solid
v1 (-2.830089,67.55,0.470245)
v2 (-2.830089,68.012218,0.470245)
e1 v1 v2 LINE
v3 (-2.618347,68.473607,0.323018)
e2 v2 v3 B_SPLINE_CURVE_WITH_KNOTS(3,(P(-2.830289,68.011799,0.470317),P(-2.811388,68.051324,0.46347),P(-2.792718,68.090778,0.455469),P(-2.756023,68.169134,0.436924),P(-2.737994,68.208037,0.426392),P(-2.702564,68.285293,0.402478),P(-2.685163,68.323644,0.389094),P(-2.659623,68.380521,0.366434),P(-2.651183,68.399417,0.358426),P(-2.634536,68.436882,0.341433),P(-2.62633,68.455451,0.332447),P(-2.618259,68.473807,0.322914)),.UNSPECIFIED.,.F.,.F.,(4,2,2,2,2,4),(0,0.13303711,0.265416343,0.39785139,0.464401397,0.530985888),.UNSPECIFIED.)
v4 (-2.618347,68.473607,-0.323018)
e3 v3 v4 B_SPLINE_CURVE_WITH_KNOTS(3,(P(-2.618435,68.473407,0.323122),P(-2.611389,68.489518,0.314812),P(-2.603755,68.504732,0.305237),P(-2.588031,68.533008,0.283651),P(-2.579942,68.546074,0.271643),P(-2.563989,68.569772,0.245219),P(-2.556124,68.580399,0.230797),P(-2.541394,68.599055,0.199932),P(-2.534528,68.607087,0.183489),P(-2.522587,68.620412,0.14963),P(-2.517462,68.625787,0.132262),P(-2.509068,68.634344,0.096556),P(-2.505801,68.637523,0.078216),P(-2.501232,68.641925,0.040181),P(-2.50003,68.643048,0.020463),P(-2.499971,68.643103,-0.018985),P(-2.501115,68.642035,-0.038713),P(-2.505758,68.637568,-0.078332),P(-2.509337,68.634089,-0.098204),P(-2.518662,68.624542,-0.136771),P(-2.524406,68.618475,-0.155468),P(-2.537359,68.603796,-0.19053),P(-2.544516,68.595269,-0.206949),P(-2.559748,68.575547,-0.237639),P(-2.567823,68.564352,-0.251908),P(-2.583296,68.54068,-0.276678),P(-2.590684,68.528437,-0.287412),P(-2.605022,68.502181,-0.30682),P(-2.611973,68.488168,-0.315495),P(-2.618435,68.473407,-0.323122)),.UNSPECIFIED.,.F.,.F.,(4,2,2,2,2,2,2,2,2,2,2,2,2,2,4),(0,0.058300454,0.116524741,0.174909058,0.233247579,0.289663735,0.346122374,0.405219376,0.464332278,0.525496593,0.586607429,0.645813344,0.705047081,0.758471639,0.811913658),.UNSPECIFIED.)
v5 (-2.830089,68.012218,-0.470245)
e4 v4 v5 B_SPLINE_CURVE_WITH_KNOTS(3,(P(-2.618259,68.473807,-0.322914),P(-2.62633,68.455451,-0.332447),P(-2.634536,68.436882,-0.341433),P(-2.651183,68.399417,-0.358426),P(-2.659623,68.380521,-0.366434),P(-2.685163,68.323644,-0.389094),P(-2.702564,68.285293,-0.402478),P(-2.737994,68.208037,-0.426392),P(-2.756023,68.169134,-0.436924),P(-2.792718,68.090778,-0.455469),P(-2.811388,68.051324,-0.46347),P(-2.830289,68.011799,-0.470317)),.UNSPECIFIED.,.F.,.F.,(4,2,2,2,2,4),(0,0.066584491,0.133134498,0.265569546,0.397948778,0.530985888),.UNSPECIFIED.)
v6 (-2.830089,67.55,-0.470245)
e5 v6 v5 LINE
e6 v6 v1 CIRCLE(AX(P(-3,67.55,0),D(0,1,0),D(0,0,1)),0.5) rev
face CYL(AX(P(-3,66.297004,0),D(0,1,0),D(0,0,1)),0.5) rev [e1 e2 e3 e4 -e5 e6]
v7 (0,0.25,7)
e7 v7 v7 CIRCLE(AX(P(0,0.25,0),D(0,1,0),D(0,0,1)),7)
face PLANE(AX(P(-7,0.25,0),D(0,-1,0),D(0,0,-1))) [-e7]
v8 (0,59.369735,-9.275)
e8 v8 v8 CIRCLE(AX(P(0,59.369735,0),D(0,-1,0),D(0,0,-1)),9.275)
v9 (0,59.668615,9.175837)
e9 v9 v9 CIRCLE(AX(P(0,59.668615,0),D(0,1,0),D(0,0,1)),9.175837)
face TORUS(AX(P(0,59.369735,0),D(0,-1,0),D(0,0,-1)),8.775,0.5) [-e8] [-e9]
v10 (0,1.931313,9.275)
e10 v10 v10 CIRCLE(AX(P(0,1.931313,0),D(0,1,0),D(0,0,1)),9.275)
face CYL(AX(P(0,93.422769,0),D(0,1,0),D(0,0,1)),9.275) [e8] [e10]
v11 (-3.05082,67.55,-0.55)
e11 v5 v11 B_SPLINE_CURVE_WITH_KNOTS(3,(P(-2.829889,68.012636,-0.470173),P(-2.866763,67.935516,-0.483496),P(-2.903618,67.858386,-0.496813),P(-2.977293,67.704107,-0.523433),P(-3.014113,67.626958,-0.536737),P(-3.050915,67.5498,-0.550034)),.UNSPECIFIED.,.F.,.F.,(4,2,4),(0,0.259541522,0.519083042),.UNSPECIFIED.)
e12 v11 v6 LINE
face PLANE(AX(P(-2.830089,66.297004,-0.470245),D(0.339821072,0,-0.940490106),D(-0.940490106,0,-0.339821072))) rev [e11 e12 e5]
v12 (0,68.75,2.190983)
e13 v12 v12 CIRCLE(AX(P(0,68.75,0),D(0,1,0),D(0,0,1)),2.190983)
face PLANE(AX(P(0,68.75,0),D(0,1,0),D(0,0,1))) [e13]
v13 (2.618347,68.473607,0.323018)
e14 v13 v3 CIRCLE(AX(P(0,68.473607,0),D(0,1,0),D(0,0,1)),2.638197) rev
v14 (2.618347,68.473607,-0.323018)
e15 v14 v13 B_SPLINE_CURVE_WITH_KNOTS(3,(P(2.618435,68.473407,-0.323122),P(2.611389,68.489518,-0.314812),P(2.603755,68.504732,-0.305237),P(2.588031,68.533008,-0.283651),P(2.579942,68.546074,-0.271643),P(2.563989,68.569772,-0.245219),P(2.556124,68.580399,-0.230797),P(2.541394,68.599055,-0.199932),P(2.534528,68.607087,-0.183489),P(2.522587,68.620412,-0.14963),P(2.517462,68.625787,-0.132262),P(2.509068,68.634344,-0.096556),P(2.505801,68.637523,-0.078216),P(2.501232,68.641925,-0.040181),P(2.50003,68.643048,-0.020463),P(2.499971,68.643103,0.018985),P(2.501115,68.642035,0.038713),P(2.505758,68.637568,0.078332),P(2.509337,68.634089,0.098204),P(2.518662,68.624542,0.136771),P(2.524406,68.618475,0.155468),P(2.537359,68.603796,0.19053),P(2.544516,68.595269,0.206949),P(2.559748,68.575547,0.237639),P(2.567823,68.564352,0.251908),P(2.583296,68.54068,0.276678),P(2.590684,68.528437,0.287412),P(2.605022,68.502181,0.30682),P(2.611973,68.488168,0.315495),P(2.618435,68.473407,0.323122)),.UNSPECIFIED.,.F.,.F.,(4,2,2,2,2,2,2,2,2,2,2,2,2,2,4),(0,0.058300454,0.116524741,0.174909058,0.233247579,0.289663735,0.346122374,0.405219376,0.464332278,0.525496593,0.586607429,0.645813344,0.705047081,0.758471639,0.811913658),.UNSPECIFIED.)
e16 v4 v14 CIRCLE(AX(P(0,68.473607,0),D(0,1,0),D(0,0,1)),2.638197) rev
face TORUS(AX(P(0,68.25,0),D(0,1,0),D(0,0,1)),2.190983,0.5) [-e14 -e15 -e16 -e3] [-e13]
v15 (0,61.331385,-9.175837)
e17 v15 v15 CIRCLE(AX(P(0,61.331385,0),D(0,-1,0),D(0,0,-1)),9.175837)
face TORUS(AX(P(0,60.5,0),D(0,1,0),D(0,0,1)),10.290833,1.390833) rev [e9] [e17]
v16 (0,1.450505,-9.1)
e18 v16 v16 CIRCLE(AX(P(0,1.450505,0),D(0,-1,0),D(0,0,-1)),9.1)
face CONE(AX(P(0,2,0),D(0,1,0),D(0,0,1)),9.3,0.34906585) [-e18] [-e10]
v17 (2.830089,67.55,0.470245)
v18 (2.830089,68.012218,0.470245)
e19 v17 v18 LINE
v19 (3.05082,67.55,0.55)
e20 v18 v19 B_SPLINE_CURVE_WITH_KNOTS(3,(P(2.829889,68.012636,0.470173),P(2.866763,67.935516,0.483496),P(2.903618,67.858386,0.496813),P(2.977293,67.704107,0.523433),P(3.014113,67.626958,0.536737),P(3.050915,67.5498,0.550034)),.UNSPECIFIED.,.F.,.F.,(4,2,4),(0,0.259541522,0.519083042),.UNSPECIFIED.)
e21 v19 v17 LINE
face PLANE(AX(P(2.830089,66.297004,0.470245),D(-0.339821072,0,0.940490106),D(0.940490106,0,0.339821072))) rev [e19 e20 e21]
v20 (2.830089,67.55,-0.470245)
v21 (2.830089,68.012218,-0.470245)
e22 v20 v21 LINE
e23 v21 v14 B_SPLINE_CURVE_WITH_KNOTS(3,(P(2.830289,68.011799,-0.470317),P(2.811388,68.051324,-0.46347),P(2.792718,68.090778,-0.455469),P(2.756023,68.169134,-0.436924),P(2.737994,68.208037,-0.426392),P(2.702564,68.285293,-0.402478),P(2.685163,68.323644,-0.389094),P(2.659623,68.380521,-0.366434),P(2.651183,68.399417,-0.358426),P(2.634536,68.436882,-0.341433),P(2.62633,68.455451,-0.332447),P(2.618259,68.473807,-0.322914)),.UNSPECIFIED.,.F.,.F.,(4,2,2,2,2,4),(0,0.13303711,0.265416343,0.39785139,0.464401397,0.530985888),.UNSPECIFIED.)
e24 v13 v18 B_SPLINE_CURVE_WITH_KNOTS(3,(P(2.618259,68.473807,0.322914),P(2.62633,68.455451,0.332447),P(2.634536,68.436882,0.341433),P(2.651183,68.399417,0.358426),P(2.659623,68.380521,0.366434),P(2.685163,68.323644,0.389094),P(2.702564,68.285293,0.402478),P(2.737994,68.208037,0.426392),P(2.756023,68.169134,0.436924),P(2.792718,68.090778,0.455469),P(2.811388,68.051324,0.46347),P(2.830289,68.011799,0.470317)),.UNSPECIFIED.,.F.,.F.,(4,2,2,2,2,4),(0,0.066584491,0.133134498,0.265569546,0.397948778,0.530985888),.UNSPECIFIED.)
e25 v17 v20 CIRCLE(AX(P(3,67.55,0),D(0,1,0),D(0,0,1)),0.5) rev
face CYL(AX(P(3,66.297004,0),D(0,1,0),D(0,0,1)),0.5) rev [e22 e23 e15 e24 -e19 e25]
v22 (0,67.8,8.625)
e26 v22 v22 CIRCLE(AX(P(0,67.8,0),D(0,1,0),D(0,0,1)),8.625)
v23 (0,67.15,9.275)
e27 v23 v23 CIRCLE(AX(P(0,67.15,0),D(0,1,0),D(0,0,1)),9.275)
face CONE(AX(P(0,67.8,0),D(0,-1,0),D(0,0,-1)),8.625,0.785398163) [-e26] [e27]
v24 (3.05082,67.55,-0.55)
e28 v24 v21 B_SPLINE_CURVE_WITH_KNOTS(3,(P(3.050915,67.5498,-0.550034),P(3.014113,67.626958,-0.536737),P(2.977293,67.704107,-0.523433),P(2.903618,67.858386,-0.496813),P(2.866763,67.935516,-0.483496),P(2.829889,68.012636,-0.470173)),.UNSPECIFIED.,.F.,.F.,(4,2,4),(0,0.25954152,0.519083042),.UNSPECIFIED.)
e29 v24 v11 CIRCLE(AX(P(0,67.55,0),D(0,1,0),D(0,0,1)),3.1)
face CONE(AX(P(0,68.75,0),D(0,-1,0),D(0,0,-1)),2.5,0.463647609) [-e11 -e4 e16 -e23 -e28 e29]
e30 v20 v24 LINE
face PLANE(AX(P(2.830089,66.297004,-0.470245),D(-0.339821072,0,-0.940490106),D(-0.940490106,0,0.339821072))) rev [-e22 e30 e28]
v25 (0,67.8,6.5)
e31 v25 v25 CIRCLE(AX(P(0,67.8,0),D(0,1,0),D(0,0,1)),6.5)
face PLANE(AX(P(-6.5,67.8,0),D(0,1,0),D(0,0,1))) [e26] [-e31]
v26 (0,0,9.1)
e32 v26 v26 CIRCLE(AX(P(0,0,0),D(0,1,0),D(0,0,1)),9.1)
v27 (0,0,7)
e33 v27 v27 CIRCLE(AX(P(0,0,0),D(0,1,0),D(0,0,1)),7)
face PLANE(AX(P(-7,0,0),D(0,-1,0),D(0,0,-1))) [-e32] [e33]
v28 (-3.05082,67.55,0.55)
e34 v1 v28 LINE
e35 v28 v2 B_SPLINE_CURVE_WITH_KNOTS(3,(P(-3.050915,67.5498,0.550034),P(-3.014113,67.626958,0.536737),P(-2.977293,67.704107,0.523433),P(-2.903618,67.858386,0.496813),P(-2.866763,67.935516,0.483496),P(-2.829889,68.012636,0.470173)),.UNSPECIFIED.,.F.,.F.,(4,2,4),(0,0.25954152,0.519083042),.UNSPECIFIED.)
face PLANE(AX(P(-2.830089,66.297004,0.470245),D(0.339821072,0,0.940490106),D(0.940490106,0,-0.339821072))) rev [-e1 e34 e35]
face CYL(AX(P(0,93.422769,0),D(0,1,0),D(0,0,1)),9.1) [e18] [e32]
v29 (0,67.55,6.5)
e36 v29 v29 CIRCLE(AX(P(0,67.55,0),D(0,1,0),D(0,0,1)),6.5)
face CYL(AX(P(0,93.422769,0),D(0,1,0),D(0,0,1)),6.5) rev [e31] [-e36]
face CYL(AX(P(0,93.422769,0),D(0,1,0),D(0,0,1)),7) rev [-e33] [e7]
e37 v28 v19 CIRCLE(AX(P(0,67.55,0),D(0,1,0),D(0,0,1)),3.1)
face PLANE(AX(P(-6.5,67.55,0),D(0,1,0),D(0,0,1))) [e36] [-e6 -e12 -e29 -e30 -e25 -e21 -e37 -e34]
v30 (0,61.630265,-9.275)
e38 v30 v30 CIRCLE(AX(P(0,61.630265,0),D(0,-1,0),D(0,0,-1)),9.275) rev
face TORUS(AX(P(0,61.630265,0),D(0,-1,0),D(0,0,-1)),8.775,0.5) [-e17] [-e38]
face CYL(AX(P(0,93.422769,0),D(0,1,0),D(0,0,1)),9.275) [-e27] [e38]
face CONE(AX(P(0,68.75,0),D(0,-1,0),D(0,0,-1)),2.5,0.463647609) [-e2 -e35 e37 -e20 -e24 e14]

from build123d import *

# Parameters (mm, degrees)
CHAMFER_1_SIZE      = 0.2
CHAMFER_1_SIZE_2    = 0.549495484
FILLET_1_R          = 0.5
CUT_EXTRUDE_1_DEPTH = 1.2


with BuildPart() as part:
    # Sketch1 → Revolve1 (revolve)
    with BuildSketch(Plane.XY, mode=Mode.PRIVATE) as revolve1_sk:
        with BuildLine():
            Line((0, 68.75), (-2.5, 68.75))
            Line((-2.5, 68.75), (-3.1, 67.55))
            Line((-3.1, 67.55), (-6.5, 67.55))
            Line((-6.5, 67.55), (-6.5, 67.8))
            Line((-6.5, 67.8), (-8.625, 67.8))
            Line((-8.625, 67.8), (-9.275, 67.15))
            Line((-9.275, 67.15), (-9.275, 61.45))
            ThreePointArc((-9.275, 61.45), (-8.9, 60.5), (-9.275, 59.55))
            Line((-9.275, 59.55), (-9.275, 2))
            Line((-9.275, 2), (-9.1, 2))
            Line((-9.1, 2), (-9.1, 0))
            Line((-9.1, 0), (-7, 0))
            Line((-7, 0), (-7, 0.25))
            Line((-7, 0.25), (0, 0.25))
            Line((0, 0.25), (0, 68.75))
        make_face()
    revolve(revolve1_sk.sketch.rotate(Axis((0, 93.422769263, 0), (0, -1, 0)), 270), axis=Axis((0, 93.422769263, 0), (0, -1, 0)))

    # Фаска1
    # the kernel refuses this chamfer: 0.549495484, 0.2 mm, written as the material it adds along each edge
    with BuildSketch(Plane(origin=(0, 2, 0), x_dir=(0, 0, 1), z_dir=(1, 0, 0))) as chamfer_1_piece_1_section:
        Polygon((9.1 + CHAMFER_1_SIZE, 0), (9.1, CHAMFER_1_SIZE_2), (9.1, 0), align=None)
    chamfer_1_piece_1 = revolve(axis=Axis((0, 2, 0), (0, -1, 0)), mode=Mode.PRIVATE)
    chamfer_1_piece_1 = chamfer_1_piece_1 & Plane(origin=(0, 1.685840324, 0), x_dir=(0, 0, 1), z_dir=(0, -1, 0)) * Cylinder(9.275, 38, mode=Mode.PRIVATE)
    add(chamfer_1_piece_1)

    # Скругление1
    fillet_1_edges = [part.edges().sort_by_distance(p)[0] for p in [
        (0, 61.45, -9.275),
        (0, 59.55, -9.275),
        (0, 68.75, -2.5),
    ]]
    fillet(fillet_1_edges, radius=FILLET_1_R)

    # Эскиз1 → Вырез-Вытянуть1 (cut)
    with BuildSketch(Plane(origin=(0, 68.75, 0), x_dir=(1, 0, 0), z_dir=(0, 1, 0))):
        with BuildLine():
            Line((-2.830089464, -0.470245053), (-3.050819562, -0.55))
            ThreePointArc((-3.050819562, -0.55), (-3.1, 0), (-3.050819562, 0.55))
            Line((-3.050819562, 0.55), (-2.830089464, 0.470245053))
            ThreePointArc((-2.830089464, 0.470245053), (-2.5, 0), (-2.830089464, -0.470245053))
        make_face()
        with BuildLine():
            Line((2.830089464, 0.470245053), (3.050819562, 0.55))
            ThreePointArc((3.050819562, 0.55), (3.1, 0), (3.050819562, -0.55))
            Line((3.050819562, -0.55), (2.830089464, -0.470245053))
            ThreePointArc((2.830089464, -0.470245053), (2.5, 0), (2.830089464, 0.470245053))
        make_face()
    extrude(amount=-CUT_EXTRUDE_1_DEPTH, mode=Mode.SUBTRACT)


solid = part.part
